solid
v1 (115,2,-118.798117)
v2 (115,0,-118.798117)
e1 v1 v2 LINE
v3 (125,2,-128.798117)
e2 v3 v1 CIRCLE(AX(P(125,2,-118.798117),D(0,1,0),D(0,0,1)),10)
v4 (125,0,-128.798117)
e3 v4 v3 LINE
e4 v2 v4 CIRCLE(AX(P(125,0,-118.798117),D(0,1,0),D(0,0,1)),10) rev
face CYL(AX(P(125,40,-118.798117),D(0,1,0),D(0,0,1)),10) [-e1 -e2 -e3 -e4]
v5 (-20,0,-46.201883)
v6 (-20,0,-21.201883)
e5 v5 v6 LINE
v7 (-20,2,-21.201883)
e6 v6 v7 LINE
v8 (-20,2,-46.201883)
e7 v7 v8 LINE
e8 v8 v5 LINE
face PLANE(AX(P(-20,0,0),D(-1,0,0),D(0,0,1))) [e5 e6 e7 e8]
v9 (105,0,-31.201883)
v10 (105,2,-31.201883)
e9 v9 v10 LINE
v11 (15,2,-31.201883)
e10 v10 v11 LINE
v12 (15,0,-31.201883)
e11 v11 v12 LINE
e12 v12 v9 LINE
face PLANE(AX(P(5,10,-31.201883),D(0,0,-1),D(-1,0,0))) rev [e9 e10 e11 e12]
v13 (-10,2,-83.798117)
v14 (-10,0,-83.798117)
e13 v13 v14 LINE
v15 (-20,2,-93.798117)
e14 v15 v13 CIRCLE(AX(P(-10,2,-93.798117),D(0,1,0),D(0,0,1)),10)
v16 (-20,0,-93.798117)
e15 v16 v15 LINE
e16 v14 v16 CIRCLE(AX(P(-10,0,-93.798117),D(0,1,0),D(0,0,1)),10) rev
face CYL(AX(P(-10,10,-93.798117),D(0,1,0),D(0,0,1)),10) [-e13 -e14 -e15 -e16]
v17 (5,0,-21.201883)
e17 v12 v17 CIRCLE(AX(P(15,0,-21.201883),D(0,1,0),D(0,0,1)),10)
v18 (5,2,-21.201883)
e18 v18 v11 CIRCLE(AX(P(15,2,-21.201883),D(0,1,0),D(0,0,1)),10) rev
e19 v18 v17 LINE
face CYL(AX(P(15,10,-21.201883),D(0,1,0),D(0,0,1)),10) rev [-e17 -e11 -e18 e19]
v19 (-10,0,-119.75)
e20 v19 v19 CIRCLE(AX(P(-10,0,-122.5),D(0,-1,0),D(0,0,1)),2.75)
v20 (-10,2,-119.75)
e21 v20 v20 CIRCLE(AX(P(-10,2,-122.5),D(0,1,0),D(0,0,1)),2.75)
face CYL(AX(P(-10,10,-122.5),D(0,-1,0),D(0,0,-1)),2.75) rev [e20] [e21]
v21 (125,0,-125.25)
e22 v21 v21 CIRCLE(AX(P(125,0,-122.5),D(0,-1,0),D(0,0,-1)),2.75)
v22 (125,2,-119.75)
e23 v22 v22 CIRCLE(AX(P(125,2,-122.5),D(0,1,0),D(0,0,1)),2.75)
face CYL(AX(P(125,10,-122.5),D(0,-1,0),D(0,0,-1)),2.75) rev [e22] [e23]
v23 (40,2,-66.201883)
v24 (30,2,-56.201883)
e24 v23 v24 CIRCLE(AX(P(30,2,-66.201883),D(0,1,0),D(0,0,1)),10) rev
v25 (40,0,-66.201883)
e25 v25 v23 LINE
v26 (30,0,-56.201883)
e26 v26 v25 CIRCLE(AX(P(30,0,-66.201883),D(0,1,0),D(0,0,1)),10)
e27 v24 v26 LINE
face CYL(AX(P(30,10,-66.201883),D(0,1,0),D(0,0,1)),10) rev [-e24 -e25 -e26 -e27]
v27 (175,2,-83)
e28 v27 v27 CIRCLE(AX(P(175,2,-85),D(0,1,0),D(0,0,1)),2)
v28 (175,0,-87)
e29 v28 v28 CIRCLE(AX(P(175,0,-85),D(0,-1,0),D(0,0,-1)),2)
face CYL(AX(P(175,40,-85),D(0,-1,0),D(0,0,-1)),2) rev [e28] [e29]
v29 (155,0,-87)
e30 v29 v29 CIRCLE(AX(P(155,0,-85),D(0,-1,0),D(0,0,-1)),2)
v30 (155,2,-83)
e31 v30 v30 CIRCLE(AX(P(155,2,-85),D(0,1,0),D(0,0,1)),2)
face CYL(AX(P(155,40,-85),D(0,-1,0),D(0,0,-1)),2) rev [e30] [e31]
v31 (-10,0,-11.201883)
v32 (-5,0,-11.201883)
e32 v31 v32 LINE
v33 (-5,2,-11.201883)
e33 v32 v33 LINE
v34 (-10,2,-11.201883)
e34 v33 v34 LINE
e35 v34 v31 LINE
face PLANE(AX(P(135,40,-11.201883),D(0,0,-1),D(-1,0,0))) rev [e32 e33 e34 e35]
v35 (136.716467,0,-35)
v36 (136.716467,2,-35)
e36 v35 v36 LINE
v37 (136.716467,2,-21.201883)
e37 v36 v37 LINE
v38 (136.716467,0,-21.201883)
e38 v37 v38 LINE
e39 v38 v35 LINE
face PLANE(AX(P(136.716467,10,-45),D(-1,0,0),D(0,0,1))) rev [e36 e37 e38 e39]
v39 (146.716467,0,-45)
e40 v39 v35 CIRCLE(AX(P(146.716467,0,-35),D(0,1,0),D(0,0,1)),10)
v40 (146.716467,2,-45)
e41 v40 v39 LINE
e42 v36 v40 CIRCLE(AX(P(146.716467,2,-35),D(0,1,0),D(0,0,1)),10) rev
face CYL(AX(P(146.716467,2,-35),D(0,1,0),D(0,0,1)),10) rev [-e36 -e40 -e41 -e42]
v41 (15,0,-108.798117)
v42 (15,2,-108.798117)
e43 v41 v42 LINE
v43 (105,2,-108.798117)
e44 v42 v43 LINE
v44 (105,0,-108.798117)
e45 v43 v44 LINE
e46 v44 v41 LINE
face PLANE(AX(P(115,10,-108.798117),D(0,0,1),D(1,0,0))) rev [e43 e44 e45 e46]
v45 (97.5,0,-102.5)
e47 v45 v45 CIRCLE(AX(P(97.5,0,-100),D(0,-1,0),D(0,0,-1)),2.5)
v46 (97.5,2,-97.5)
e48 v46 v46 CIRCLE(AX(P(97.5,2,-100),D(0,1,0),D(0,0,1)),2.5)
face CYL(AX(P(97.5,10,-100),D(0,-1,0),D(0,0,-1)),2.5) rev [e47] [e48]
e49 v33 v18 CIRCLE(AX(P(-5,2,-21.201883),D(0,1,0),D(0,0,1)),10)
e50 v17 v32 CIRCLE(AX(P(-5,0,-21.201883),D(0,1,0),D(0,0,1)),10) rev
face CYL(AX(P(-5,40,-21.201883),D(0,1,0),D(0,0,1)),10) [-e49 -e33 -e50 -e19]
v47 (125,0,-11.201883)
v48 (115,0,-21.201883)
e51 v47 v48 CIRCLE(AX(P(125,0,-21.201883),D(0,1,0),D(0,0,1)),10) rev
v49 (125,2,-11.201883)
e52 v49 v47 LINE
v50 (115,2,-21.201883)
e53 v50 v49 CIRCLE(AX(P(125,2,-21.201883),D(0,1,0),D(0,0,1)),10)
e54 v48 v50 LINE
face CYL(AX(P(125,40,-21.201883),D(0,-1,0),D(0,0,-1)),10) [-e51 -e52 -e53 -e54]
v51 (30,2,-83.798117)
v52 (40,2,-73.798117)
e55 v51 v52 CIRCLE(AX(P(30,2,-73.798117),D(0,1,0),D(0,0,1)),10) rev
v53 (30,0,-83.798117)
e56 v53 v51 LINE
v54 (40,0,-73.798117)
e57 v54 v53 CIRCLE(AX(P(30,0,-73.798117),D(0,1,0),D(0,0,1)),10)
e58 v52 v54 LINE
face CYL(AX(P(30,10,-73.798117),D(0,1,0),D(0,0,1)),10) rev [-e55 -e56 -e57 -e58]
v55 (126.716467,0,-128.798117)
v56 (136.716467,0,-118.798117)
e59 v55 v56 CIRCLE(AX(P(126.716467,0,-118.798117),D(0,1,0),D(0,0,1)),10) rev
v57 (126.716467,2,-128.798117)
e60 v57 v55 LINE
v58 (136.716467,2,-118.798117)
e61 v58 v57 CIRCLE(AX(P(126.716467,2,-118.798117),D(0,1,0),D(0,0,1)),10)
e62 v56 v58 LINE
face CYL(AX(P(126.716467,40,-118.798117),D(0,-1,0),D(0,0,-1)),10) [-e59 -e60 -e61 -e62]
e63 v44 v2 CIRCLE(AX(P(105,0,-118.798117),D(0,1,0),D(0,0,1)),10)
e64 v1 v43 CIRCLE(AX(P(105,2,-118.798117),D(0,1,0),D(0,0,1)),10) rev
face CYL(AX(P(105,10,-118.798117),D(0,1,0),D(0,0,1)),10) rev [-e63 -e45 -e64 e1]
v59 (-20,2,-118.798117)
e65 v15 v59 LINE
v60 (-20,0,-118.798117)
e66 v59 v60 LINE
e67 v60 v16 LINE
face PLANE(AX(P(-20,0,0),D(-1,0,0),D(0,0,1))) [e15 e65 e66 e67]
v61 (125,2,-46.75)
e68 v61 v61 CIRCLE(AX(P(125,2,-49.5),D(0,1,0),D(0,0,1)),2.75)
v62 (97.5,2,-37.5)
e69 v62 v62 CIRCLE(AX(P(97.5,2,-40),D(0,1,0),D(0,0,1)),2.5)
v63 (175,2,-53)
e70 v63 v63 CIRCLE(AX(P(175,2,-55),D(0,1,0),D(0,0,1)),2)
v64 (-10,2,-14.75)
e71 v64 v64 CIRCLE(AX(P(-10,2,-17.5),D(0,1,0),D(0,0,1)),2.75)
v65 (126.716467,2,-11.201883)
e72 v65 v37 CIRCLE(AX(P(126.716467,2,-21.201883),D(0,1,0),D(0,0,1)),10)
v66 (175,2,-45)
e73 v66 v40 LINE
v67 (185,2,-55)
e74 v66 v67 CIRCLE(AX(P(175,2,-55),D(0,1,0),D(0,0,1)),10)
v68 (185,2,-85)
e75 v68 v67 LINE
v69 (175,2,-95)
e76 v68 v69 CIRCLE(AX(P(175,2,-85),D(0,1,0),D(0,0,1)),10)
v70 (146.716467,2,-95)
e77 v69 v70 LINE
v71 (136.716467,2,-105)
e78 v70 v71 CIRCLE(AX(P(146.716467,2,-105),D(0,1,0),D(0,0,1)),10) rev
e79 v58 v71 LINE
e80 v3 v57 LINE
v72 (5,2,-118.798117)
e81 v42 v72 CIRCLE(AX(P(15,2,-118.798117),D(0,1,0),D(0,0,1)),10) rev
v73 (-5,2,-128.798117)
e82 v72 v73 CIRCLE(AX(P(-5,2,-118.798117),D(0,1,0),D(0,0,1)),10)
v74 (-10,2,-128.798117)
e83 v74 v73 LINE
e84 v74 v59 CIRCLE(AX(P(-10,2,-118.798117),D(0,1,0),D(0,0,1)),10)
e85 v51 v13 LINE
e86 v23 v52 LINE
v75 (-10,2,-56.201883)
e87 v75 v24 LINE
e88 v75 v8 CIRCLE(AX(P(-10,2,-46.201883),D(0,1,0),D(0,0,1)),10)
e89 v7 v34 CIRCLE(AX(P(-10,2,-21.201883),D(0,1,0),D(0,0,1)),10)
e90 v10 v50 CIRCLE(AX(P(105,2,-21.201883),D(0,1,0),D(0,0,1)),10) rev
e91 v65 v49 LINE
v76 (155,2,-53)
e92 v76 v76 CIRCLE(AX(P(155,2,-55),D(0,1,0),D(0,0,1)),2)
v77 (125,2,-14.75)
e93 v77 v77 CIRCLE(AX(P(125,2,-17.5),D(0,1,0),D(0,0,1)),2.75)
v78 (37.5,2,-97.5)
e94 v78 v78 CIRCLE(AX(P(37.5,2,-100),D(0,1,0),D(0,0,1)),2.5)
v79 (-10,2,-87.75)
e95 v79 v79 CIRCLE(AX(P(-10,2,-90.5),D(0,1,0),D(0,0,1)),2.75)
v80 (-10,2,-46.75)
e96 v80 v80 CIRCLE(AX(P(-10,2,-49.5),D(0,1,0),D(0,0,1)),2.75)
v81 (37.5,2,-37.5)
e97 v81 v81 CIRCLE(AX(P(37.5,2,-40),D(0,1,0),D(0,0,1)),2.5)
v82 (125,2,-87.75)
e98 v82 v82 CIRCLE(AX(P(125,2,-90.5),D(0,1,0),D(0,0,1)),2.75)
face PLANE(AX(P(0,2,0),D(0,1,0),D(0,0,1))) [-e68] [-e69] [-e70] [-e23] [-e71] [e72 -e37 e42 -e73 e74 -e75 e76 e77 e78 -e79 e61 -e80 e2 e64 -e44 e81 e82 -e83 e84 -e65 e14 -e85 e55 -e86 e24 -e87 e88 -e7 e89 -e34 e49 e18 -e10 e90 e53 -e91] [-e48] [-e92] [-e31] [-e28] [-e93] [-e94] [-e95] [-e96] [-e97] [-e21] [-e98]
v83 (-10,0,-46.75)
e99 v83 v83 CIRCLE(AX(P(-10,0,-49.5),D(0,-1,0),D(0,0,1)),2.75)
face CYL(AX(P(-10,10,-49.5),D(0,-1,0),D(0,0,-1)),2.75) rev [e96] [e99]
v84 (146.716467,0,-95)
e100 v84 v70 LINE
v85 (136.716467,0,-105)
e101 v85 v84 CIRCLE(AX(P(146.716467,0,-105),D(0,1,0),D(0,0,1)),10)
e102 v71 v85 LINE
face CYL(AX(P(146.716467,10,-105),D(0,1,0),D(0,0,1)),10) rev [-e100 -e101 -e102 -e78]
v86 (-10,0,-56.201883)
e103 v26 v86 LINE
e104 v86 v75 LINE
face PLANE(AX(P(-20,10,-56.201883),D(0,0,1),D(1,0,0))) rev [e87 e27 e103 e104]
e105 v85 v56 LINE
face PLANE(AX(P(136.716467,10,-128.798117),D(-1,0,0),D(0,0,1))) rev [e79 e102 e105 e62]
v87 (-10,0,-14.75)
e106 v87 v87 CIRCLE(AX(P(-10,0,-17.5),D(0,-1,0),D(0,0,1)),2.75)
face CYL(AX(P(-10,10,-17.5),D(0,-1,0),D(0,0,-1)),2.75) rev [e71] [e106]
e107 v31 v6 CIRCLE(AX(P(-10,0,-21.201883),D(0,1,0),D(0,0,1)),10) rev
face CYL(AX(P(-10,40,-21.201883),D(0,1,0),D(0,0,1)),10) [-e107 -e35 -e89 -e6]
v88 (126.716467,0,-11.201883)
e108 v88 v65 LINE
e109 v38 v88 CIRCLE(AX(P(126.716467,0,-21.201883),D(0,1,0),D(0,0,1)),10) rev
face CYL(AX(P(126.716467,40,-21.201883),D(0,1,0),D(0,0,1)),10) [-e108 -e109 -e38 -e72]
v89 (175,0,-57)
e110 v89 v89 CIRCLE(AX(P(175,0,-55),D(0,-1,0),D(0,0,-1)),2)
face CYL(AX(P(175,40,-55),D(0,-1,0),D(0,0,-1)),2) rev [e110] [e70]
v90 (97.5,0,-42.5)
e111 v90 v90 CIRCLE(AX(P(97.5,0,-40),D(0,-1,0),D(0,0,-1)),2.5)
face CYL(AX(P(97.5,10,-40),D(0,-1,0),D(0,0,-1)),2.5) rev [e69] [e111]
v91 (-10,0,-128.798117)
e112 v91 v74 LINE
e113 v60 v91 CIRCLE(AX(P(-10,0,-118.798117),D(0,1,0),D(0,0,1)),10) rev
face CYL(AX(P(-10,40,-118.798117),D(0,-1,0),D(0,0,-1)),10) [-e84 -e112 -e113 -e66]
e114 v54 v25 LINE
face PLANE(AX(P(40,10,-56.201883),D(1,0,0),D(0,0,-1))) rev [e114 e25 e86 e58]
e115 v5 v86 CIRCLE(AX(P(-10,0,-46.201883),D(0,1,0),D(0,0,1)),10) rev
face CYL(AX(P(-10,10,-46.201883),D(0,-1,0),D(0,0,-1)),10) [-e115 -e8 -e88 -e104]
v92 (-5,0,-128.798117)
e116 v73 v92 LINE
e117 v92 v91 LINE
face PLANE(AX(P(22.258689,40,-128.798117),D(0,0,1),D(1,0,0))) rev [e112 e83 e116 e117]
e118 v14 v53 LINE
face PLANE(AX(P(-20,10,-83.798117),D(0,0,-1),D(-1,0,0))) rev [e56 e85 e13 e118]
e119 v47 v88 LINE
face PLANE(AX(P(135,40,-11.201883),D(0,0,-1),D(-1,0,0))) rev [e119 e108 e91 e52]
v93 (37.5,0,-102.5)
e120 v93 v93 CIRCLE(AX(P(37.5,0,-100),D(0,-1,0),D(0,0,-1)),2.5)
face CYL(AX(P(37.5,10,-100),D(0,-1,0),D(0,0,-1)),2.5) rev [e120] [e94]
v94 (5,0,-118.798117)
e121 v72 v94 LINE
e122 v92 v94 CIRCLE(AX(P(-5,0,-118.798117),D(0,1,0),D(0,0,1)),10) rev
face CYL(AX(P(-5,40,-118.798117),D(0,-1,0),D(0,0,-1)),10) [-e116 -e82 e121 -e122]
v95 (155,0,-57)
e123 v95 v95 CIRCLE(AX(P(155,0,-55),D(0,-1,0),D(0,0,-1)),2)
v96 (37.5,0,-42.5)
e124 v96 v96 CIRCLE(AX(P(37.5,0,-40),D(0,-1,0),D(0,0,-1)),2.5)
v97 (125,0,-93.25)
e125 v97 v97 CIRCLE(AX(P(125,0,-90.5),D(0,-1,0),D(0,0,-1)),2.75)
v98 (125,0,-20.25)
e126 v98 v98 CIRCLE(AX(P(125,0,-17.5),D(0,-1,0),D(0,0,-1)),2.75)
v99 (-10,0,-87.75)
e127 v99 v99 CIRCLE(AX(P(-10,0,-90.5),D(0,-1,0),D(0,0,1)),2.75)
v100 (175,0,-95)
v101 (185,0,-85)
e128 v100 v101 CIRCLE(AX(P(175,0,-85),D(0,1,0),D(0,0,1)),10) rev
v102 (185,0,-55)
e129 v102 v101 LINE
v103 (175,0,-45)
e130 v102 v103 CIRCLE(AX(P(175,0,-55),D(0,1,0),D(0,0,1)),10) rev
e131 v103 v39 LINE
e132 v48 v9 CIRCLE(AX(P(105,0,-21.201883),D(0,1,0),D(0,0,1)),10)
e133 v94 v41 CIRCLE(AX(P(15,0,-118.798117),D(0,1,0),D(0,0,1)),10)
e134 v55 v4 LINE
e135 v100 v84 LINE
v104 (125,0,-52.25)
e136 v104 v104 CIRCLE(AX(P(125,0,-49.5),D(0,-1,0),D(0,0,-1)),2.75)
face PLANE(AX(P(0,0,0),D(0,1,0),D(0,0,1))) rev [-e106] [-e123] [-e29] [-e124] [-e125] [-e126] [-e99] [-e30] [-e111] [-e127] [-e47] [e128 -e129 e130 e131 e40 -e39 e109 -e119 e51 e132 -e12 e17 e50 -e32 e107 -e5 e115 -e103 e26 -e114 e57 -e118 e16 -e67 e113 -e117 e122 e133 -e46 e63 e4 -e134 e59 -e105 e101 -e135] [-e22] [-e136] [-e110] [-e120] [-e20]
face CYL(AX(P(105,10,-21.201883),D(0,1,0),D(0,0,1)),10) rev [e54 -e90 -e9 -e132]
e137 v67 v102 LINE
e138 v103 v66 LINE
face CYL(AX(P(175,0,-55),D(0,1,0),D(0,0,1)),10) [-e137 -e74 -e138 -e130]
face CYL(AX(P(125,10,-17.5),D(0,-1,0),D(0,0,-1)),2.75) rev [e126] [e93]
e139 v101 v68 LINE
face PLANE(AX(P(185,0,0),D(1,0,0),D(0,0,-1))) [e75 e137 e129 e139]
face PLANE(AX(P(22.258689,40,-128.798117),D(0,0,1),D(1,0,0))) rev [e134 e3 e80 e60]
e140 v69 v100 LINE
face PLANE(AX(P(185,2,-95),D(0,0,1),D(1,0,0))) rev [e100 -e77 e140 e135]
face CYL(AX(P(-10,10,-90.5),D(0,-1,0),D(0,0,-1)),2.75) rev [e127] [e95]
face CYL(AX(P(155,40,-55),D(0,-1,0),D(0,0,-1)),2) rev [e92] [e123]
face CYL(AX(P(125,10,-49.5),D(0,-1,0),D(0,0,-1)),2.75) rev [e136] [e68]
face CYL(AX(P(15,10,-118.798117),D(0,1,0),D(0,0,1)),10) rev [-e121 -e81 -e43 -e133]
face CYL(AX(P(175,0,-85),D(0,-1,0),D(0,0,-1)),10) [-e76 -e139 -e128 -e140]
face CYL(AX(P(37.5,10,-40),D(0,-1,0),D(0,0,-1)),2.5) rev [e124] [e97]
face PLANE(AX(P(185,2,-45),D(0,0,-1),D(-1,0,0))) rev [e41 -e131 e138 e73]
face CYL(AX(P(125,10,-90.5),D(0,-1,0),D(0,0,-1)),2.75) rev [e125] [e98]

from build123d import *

# Parameters (mm, degrees)
SKETCH1_W           = 80
SKETCH1_H           = 140
BOSS_EXTRUDE1_DEPTH = 2
SKETCH4_W           = 140
SKETCH4_H           = 2
BOSS_EXTRUDE2_DEPTH = 35
SKETCH5_W           = 140
SKETCH5_H           = 2
BOSS_EXTRUDE3_DEPTH = 20
SKETCH2_R           = 2.5
CUT_EXTRUDE1_DEPTH  = 10
SKETCH7_W           = 140
SKETCH7_H           = 2
BOSS_EXTRUDE5_DEPTH = 20
SKETCH8_R           = 2.75
CUT_EXTRUDE2_DEPTH  = 10
SKETCH9_W           = 50
SKETCH9_H           = 2
BOSS_EXTRUDE6_DEPTH = 50
SKETCH10_R          = 2
CUT_EXTRUDE3_DEPTH  = 40
CUT_EXTRUDE4_DEPTH  = 40
CHAMFER1_SIZE       = 49.985180236
CHAMFER1_SIZE_2     = 35
SKETCH12_W          = 60
SKETCH12_H          = 27.596233816
CUT_EXTRUDE5_DEPTH  = 10
CUT_EXTRUDE6_DEPTH  = 10
SKETCH14_W          = 110
SKETCH14_H          = 20
CUT_EXTRUDE7_DEPTH  = 10
FILLET1_R           = 10


# Some blends are built 0.0001 mm under size
with BuildPart() as part:
    # Sketch1 → Boss-Extrude1 (new body)
    with BuildSketch(Plane(origin=(0, 0, 0), x_dir=(1, 0, 0), z_dir=(0, 1, 0))):
        with Locations((40, 70)):
            Rectangle(SKETCH1_W, SKETCH1_H)
    extrude(amount=BOSS_EXTRUDE1_DEPTH)

    # Sketch4 → Boss-Extrude2 (add)
    with BuildSketch(Plane(origin=(80, 0, 0), x_dir=(0, 0, -1), z_dir=(1, 0, 0))):
        with Locations((70, 1)):
            Rectangle(SKETCH4_W, SKETCH4_H)
    extrude(amount=BOSS_EXTRUDE2_DEPTH)

    # Sketch5 → Boss-Extrude3 (add)
    with BuildSketch(Plane(origin=(115, 0, 0), x_dir=(0, 0, -1), z_dir=(1, 0, 0))):
        with Locations((70, 1)):
            Rectangle(SKETCH5_W, SKETCH5_H)
    extrude(amount=BOSS_EXTRUDE3_DEPTH)

    # Sketch2 → Cut-Extrude1 (cut)
    with BuildSketch(Plane.XZ):
        with Locations(Location((97.5, -100, 0), (0, 0, 270))):
            Circle(SKETCH2_R)
        with Locations(Location((97.5, -40, 0), (0, 0, 270))):
            Circle(SKETCH2_R)
        with Locations(Location((37.5, -40, 0), (0, 0, 270))):
            Circle(SKETCH2_R)
        with Locations(Location((37.5, -100, 0), (0, 0, 270))):
            Circle(SKETCH2_R)
    extrude(amount=-CUT_EXTRUDE1_DEPTH, mode=Mode.SUBTRACT)

    # Sketch7 → Boss-Extrude5 (add)
    with BuildSketch(Plane.ZY):
        with Locations((-70, 1)):
            Rectangle(SKETCH7_W, SKETCH7_H)
    extrude(amount=BOSS_EXTRUDE5_DEPTH)

    # Sketch8 → Cut-Extrude2 (cut)
    with BuildSketch(Plane.XZ):
        with Locations(Location((125, -17.5, 0), (0, 0, 270))):
            Circle(SKETCH8_R)
        with Locations(Location((125, -49.5, 0), (0, 0, 270))):
            Circle(SKETCH8_R)
        with Locations(Location((125, -90.5, 0), (0, 0, 270))):
            Circle(SKETCH8_R)
        with Locations(Location((125, -122.5, 0), (0, 0, 270))):
            Circle(SKETCH8_R)
        with Locations(Location((-10, -122.5, 0), (0, 0, 90))):
            Circle(SKETCH8_R)
        with Locations(Location((-10, -90.5, 0), (0, 0, 90))):
            Circle(SKETCH8_R)
        with Locations(Location((-10, -49.5, 0), (0, 0, 90))):
            Circle(SKETCH8_R)
        with Locations(Location((-10, -17.5, 0), (0, 0, 90))):
            Circle(SKETCH8_R)
    extrude(amount=-CUT_EXTRUDE2_DEPTH, mode=Mode.SUBTRACT)

    # Sketch9 → Boss-Extrude6 (add)
    with BuildSketch(Plane(origin=(135, 0, 0), x_dir=(0, 0, -1), z_dir=(1, 0, 0))):
        with Locations((70, 1)):
            Rectangle(SKETCH9_W, SKETCH9_H)
    extrude(amount=BOSS_EXTRUDE6_DEPTH)

    # Sketch10 → Cut-Extrude3 (cut)
    with BuildSketch(Plane.XZ):
        with Locations(Location((175, -55, 0), (0, 0, 270))):
            Circle(SKETCH10_R)
        with Locations(Location((175, -85, 0), (0, 0, 270))):
            Circle(SKETCH10_R)
        with Locations(Location((155, -85, 0), (0, 0, 270))):
            Circle(SKETCH10_R)
        with Locations(Location((155, -55, 0), (0, 0, 270))):
            Circle(SKETCH10_R)
    extrude(amount=-CUT_EXTRUDE3_DEPTH, mode=Mode.SUBTRACT)

    # Sketch11 → Cut-Extrude4 (cut)
    with BuildSketch(Plane.XZ):
        Polygon((135, -11.201883092), (22.258688724, -11.201883092), (-20, -11.201883092), (-20, 0), (135, 0), align=None)
        Polygon((135, -140), (135, -128.798116908), (22.258688724, -128.798116908), (-20, -128.798116908), (-20, -140), align=None)
    extrude(amount=-CUT_EXTRUDE4_DEPTH, mode=Mode.SUBTRACT)

    # Chamfer1
    # the kernel refuses this chamfer: 49.985180236, 35 mm, written as the material it adds along each edge
    with BuildSketch(Plane(origin=(135, 2, -95), x_dir=(0.9997533347641299, 0, 0.022209674198457038), z_dir=(0, -1, 0))) as chamfer1_piece_1_section:
        Polygon((CHAMFER1_SIZE * 0.999753334764, -CHAMFER1_SIZE * 0.0222096741984), (-CHAMFER1_SIZE_2 * 0.0222096741985, -CHAMFER1_SIZE_2 * 0.999753334764), (0, 0), align=None)
    chamfer1_piece_1 = extrude(amount=2, mode=Mode.PRIVATE)
    chamfer1_piece_1 = split(chamfer1_piece_1, bisect_by=Plane(origin=(151.760683993, 1, -128.798116908), z_dir=(0, 0, 1)), keep=Keep.TOP, mode=Mode.PRIVATE)
    add(chamfer1_piece_1)
    with BuildSketch(Plane(origin=(135, 0, -45), x_dir=(-0.045263737714021514, 0, 0.9989750717851553), z_dir=(0, 1, 0))) as chamfer1_piece_2_section:
        Polygon((CHAMFER1_SIZE_2 * 0.998975071785, CHAMFER1_SIZE_2 * 0.045263737714), (-CHAMFER1_SIZE * 0.045263737714, CHAMFER1_SIZE * 0.998975071785), (0, 0), align=None)
    chamfer1_piece_2 = extrude(amount=2, mode=Mode.PRIVATE)
    chamfer1_piece_2 = split(chamfer1_piece_2, bisect_by=Plane(origin=(151.760683993, 1, -11.201883092), z_dir=(0, 0, -1)), keep=Keep.TOP, mode=Mode.PRIVATE)
    add(chamfer1_piece_2)

    # Sketch12 → Cut-Extrude5 (cut)
    with BuildSketch(Plane.XZ):
        with Locations((10, -70)):
            Rectangle(SKETCH12_W, SKETCH12_H)
    extrude(amount=-CUT_EXTRUDE5_DEPTH, mode=Mode.SUBTRACT)

    # Sketch13 → Cut-Extrude6 (cut)
    with BuildSketch(Plane.XZ):
        Polygon((184.985180236, -45), (136.716466943, -45), (136.716466943, -11.201883092), align=None)
        Polygon((184.985180236, -95), (136.716466943, -128.798116908), (136.716466943, -95), align=None)
    extrude(amount=-CUT_EXTRUDE6_DEPTH, mode=Mode.SUBTRACT)

    # Sketch14 → Cut-Extrude7 (cut)
    with BuildSketch(Plane.XZ):
        with Locations((60, -21.201883092)):
            Rectangle(SKETCH14_W, SKETCH14_H)
        with Locations((60, -118.798116908)):
            Rectangle(SKETCH14_W, SKETCH14_H)
    extrude(amount=-CUT_EXTRUDE7_DEPTH, mode=Mode.SUBTRACT)

    # Fillet1
    fillet1_edges = [part.edges().sort_by_distance(p)[0] for p in [
        (185, 1, -45),
        (185, 1, -95),
        (-20, 1, -128.798116908),
        (-20, 1, -11.201883092),
        (136.716466943, 1, -128.798116908),
        (136.716466943, 1, -11.201883092),
        (-20, 1, -83.798116908),
        (-20, 1, -56.201883092),
        (40, 1, -56.201883092),
        (40, 1, -83.798116908),
        (136.716466943, 1, -45),
        (136.716466943, 1, -95),
        (115, 1, -11.201883092),
        (5, 1, -11.201883092),
        (5, 1, -128.798116908),
        (115, 1, -128.798116908),
        (5, 1, -31.201883092),
        (115, 1, -31.201883092),
        (115, 1, -108.798116908),
        (5, 1, -108.798116908),
    ]]
    fillet(fillet1_edges, radius=FILLET1_R - 0.0001)  # a hair under: the kernel refuses the full size


solid = part.part
